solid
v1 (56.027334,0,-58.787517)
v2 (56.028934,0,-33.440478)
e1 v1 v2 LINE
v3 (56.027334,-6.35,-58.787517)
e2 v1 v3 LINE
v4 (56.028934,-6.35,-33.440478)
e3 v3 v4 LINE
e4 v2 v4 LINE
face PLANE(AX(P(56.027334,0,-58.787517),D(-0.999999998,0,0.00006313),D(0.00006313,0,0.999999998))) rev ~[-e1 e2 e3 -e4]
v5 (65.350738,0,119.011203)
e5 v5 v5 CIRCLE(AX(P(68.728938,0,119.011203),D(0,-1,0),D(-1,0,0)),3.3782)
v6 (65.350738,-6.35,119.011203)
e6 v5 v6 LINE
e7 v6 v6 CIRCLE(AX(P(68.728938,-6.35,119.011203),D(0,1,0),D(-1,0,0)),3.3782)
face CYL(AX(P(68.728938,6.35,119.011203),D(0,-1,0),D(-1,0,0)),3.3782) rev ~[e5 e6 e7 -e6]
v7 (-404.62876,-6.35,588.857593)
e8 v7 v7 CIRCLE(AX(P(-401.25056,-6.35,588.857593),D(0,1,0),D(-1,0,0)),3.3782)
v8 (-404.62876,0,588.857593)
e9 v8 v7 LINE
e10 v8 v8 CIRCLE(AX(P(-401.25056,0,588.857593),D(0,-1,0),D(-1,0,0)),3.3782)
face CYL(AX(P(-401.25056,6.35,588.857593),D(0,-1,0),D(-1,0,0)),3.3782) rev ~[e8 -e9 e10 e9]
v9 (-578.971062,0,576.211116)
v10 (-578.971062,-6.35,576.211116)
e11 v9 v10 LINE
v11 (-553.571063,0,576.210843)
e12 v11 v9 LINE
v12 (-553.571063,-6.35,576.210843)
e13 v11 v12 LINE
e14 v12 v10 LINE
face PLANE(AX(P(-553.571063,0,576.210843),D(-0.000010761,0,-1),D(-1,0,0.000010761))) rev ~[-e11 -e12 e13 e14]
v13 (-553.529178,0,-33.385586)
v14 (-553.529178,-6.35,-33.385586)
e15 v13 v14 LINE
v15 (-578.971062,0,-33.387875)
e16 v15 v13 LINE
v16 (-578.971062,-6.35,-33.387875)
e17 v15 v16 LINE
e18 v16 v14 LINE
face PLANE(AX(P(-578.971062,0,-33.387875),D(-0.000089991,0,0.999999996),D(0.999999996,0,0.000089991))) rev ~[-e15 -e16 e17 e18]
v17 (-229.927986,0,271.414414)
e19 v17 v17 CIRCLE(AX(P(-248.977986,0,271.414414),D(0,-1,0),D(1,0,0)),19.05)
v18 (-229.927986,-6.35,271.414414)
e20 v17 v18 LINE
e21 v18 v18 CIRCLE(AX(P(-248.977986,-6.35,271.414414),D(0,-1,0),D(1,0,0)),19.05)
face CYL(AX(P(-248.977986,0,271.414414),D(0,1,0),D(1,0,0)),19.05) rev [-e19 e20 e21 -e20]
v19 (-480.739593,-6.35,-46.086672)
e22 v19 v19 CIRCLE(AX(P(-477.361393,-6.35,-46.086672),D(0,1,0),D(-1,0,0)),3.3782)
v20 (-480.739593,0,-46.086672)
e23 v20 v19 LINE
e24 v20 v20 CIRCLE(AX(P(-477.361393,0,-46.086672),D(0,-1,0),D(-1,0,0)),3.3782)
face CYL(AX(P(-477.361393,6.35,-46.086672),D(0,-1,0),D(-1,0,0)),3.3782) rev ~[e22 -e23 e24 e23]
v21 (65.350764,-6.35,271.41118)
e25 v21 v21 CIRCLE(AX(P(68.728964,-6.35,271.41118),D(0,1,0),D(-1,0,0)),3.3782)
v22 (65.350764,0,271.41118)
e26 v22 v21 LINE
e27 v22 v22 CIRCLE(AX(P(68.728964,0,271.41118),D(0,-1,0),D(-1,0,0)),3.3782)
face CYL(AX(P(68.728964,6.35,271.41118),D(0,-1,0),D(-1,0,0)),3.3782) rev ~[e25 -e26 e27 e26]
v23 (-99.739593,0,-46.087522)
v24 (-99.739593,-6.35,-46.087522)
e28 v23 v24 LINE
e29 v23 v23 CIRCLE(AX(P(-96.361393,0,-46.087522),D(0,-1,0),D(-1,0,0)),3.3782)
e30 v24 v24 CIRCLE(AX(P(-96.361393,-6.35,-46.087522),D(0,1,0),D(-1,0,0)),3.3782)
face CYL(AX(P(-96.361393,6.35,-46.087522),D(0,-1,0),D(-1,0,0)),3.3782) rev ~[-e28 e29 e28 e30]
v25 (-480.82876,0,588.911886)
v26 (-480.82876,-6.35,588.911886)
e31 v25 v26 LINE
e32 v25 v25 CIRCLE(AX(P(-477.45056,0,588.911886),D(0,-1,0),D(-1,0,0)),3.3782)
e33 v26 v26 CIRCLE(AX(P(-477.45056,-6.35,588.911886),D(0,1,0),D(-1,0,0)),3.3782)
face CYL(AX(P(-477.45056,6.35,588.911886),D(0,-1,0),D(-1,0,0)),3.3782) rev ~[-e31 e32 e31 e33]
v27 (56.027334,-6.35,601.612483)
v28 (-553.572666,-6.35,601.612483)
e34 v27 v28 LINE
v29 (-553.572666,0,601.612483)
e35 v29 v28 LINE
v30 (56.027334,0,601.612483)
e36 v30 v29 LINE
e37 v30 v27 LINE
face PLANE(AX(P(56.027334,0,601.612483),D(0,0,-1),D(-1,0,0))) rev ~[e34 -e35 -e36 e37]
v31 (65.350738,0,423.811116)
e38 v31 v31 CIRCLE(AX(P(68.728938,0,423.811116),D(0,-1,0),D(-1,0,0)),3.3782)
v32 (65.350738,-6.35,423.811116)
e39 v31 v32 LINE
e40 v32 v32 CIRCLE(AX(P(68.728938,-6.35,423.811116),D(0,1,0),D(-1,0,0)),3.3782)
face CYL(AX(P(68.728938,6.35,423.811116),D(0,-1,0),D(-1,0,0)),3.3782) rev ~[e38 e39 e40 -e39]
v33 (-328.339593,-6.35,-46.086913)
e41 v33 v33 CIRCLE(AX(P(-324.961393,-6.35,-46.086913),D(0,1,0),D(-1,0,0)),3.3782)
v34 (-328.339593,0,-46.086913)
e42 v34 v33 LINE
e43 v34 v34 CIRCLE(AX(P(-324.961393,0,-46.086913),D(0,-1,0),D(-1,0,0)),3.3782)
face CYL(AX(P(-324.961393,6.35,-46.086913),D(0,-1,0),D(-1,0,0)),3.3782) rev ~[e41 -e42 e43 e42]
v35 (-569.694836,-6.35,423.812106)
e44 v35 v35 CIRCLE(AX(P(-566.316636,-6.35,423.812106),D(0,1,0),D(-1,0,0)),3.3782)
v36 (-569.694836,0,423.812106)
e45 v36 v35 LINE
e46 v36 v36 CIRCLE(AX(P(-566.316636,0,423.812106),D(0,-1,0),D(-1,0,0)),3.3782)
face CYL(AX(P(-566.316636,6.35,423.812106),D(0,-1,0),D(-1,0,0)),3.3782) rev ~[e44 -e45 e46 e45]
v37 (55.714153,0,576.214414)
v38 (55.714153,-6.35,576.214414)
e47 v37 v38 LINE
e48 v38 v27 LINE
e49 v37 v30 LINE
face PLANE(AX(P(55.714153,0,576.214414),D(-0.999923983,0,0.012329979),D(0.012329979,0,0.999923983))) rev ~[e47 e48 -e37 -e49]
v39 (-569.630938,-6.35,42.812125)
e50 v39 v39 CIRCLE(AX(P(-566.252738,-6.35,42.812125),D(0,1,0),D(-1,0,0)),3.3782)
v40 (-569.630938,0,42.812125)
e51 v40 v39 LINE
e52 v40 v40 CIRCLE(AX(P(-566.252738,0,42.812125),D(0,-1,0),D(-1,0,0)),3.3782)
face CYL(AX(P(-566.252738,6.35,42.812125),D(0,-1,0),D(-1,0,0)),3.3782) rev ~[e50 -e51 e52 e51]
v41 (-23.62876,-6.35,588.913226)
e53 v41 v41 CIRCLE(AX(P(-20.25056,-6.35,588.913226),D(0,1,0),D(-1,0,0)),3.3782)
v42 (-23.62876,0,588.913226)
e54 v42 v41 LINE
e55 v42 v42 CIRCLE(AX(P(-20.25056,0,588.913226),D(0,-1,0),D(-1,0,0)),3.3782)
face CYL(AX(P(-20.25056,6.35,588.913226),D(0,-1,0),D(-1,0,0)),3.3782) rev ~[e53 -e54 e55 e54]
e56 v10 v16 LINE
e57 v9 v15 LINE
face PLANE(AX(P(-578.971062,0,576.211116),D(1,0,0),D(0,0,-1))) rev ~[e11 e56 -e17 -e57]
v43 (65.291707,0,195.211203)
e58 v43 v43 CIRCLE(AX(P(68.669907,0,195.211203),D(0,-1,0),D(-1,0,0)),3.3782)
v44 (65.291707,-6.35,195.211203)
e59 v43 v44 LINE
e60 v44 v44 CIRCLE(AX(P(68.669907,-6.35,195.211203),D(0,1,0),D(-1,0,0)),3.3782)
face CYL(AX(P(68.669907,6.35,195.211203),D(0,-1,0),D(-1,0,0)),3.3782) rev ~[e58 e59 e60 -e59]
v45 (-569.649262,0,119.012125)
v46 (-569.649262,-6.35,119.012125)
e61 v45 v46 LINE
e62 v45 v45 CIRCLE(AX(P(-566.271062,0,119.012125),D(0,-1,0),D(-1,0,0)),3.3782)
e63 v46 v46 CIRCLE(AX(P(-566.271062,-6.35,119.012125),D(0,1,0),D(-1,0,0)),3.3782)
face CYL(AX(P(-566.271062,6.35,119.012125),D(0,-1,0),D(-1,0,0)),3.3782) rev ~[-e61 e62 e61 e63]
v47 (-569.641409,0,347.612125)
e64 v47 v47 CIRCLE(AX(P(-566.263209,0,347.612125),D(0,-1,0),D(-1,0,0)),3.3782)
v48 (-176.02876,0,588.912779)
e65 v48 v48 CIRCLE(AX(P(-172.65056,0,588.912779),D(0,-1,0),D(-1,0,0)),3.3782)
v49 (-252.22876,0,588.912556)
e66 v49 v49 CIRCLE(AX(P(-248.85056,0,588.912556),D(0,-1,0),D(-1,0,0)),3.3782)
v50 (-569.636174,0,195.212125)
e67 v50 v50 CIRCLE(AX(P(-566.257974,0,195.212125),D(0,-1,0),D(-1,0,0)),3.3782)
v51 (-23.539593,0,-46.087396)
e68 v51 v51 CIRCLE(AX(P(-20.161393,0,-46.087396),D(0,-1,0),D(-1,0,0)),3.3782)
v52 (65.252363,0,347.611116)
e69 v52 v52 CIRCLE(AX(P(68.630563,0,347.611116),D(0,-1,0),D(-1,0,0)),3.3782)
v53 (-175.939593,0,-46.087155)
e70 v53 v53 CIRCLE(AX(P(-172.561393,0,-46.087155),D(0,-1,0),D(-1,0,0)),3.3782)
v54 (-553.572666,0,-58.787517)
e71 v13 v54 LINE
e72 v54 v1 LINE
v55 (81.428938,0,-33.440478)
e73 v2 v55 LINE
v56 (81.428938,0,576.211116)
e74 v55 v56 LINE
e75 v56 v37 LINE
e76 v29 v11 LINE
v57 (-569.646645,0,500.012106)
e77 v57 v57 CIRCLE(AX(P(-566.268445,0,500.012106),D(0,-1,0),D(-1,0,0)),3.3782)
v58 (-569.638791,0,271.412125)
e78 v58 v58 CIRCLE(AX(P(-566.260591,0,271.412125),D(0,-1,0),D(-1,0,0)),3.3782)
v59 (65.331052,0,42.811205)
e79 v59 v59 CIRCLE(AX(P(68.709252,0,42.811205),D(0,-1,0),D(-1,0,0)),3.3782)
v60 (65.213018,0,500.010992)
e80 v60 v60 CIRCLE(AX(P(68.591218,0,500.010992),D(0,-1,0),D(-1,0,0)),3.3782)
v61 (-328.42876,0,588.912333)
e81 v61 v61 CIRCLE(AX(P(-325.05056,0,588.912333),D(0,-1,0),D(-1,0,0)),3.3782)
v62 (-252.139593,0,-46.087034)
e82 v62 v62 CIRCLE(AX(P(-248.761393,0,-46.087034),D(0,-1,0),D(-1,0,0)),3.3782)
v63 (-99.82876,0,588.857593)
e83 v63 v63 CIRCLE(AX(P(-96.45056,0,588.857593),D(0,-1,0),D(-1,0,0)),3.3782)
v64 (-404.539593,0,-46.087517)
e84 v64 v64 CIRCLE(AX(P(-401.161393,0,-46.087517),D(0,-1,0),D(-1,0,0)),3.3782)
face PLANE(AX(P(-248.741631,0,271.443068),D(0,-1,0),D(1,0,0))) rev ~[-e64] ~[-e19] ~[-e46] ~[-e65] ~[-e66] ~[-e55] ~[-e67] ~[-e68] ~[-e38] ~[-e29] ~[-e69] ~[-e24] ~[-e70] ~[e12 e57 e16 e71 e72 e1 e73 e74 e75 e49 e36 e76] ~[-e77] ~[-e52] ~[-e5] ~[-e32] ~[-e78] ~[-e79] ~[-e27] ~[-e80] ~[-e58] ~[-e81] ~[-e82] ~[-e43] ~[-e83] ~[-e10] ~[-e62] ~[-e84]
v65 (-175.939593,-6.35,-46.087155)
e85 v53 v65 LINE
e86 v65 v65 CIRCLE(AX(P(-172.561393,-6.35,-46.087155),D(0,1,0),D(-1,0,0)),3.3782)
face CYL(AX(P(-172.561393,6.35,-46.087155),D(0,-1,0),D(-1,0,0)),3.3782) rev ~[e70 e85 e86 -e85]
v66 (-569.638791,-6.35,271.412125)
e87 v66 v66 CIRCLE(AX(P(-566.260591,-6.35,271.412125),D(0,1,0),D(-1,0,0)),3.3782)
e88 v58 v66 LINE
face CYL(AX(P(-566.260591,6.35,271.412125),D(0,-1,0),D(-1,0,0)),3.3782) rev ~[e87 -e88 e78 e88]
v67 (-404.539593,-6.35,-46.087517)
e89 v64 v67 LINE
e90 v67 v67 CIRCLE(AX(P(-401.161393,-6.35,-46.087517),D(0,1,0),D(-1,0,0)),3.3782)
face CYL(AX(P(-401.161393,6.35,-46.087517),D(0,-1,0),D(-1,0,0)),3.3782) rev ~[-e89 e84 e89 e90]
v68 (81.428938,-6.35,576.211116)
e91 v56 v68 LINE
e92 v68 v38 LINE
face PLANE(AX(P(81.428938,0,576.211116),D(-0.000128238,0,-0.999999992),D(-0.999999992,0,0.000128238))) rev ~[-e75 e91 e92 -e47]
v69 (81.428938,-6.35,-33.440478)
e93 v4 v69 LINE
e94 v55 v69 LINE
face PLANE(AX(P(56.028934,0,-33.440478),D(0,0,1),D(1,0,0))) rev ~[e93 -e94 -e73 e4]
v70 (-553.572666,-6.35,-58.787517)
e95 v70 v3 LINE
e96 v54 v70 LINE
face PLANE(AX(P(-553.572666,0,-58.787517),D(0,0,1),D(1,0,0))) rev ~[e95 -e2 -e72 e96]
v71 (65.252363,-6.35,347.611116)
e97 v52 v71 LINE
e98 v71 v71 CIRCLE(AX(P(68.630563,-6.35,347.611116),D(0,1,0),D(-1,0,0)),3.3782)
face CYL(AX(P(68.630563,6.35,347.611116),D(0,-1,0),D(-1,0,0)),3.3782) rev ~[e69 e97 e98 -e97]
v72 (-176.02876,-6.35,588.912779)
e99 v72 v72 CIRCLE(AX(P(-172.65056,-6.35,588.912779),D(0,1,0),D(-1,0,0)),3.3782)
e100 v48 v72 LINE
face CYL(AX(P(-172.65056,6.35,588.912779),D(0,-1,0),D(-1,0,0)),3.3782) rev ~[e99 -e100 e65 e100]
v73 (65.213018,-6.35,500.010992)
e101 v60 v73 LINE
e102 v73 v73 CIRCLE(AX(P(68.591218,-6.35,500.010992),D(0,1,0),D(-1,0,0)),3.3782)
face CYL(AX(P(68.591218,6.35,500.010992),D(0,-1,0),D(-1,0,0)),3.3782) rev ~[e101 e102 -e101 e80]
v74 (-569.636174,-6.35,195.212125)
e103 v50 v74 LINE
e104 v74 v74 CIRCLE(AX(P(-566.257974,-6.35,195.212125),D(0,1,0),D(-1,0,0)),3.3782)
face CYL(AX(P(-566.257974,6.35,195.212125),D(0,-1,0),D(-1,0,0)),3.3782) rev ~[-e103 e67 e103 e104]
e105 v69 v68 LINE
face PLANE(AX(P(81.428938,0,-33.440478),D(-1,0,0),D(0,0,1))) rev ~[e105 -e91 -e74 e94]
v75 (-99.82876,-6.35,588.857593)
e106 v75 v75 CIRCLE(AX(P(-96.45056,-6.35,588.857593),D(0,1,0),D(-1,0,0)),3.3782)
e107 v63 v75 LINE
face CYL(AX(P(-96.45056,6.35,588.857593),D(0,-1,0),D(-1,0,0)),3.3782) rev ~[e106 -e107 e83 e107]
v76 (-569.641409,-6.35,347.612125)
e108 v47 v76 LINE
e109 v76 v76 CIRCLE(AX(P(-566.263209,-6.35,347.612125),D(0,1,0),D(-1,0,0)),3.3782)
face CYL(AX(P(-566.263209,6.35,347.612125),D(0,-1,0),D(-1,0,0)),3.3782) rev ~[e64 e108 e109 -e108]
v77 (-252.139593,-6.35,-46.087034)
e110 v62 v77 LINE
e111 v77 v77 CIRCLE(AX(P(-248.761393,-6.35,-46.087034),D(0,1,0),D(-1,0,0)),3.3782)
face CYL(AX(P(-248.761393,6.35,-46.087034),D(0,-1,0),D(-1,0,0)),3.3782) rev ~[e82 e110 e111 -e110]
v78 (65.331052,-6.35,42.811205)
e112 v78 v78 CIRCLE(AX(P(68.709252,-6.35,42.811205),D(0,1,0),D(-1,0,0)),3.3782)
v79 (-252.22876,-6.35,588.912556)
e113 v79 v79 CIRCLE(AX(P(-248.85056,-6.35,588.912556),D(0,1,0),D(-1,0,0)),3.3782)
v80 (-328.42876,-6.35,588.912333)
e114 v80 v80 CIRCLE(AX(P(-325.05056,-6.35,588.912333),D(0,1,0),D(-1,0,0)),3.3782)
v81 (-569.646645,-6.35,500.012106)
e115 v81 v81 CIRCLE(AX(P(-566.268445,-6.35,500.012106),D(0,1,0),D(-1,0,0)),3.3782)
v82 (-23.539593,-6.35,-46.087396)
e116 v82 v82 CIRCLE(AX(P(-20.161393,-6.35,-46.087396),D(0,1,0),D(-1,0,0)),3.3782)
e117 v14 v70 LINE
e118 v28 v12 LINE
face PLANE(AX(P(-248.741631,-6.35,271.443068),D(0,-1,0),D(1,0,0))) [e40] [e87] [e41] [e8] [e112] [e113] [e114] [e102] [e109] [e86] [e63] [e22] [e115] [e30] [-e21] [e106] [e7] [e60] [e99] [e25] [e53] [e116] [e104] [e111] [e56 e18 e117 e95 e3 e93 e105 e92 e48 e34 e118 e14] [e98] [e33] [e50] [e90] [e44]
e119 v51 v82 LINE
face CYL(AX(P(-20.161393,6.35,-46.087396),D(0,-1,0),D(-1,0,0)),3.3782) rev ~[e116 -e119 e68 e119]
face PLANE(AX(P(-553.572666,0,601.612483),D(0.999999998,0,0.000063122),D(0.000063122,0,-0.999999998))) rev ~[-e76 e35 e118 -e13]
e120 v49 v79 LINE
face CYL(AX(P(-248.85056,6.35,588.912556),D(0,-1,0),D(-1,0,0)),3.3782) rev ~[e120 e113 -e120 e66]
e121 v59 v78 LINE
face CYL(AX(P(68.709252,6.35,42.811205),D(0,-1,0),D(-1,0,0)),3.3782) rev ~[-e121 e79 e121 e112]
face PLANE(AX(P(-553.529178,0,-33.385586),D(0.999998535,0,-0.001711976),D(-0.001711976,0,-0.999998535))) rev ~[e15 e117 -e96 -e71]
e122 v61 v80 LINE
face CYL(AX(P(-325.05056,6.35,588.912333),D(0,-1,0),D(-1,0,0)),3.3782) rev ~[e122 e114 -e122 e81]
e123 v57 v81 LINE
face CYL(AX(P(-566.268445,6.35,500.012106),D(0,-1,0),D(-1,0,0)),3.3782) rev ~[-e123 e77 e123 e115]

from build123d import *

# Parameters (mm, degrees)
F0_R     = 19.05
F1_DEPTH = 6.35
F2_D     = 6.7564
F2_DEPTH = 6.35
F2_TIP   = 2.0298273432


# Not quite as in the source:
# - ends of sketch curves that miss each other by under 0.0002 mm in the source are joined


with BuildPart() as f1:
    # F0 (on Front) → F1 (new body)
    with BuildSketch(Plane.XZ):
        Polygon((56.0273340809, 601.6124832813), (-553.5726659191, 601.6124832813), (-553.5710625288, 576.2108431508), (-578.9710624604, 576.2111164925), (-578.9710624604, -33.3878754139), (-553.5291783666, -33.3855858849), (-553.5726659191, -58.7875167187), (56.0273340809, -58.7875167187), (56.0289342467, -33.4404784252), (81.4289375396, -33.4404784254), (81.4289375396, 576.2111164925), (55.7141526242, 576.2144141151), align=None)
        with Locations((-248.9779856181, 271.4144141151)):
            Circle(F0_R, mode=Mode.SUBTRACT)
    extrude(amount=F1_DEPTH)

    # F2
    with Locations(Plane(origin=(0, 0, 0), x_dir=(1, 0, 0), z_dir=(0, 1, 0))):
        with Locations((-477.4505604353, -588.9118862284), (-401.2505604353, -588.8575930831), (-325.0505604353, -588.9123327142), (-248.8505604357, -588.9125559571), (-172.6505604357, -588.9127792), (-96.4505604357, -588.8575930831), (-20.2505604357, -588.9132256859), (68.5912178787, -500.010992039), (68.7289375396, -423.8111164925), (68.6305625245, -347.6111164925), (68.72896387, -271.4111800281), (68.6699071802, -195.2112029133), (68.7289375396, -119.0112029133), (68.7092518575, -42.8112054561), (-20.1613931545, 46.0873960761), (-96.3613931545, 46.0875217216), (-172.5613931536, 46.0871547073), (-248.7613931536, 46.0870340229), (-324.9613931536, 46.0869133385), (-401.1613931536, 46.0875167187), (-477.3613931536, 46.0866719696), (-566.2527381441, -42.8121245861), (-566.2710624604, -119.0121245861), (-566.2579736841, -195.2121245861), (-566.260591454, -271.4121245861), (-566.263209224, -347.6121245861), (-566.3166356603, -423.8121062841), (-566.2684447633, -500.0121062841)):
            Hole(F2_D / 2, depth=F2_DEPTH)
            with Locations((0, 0, -(F2_DEPTH + F2_TIP / 2))):  # 118° drill point
                Cone(0, F2_D / 2, F2_TIP, mode=Mode.SUBTRACT)


solid = f1.part
